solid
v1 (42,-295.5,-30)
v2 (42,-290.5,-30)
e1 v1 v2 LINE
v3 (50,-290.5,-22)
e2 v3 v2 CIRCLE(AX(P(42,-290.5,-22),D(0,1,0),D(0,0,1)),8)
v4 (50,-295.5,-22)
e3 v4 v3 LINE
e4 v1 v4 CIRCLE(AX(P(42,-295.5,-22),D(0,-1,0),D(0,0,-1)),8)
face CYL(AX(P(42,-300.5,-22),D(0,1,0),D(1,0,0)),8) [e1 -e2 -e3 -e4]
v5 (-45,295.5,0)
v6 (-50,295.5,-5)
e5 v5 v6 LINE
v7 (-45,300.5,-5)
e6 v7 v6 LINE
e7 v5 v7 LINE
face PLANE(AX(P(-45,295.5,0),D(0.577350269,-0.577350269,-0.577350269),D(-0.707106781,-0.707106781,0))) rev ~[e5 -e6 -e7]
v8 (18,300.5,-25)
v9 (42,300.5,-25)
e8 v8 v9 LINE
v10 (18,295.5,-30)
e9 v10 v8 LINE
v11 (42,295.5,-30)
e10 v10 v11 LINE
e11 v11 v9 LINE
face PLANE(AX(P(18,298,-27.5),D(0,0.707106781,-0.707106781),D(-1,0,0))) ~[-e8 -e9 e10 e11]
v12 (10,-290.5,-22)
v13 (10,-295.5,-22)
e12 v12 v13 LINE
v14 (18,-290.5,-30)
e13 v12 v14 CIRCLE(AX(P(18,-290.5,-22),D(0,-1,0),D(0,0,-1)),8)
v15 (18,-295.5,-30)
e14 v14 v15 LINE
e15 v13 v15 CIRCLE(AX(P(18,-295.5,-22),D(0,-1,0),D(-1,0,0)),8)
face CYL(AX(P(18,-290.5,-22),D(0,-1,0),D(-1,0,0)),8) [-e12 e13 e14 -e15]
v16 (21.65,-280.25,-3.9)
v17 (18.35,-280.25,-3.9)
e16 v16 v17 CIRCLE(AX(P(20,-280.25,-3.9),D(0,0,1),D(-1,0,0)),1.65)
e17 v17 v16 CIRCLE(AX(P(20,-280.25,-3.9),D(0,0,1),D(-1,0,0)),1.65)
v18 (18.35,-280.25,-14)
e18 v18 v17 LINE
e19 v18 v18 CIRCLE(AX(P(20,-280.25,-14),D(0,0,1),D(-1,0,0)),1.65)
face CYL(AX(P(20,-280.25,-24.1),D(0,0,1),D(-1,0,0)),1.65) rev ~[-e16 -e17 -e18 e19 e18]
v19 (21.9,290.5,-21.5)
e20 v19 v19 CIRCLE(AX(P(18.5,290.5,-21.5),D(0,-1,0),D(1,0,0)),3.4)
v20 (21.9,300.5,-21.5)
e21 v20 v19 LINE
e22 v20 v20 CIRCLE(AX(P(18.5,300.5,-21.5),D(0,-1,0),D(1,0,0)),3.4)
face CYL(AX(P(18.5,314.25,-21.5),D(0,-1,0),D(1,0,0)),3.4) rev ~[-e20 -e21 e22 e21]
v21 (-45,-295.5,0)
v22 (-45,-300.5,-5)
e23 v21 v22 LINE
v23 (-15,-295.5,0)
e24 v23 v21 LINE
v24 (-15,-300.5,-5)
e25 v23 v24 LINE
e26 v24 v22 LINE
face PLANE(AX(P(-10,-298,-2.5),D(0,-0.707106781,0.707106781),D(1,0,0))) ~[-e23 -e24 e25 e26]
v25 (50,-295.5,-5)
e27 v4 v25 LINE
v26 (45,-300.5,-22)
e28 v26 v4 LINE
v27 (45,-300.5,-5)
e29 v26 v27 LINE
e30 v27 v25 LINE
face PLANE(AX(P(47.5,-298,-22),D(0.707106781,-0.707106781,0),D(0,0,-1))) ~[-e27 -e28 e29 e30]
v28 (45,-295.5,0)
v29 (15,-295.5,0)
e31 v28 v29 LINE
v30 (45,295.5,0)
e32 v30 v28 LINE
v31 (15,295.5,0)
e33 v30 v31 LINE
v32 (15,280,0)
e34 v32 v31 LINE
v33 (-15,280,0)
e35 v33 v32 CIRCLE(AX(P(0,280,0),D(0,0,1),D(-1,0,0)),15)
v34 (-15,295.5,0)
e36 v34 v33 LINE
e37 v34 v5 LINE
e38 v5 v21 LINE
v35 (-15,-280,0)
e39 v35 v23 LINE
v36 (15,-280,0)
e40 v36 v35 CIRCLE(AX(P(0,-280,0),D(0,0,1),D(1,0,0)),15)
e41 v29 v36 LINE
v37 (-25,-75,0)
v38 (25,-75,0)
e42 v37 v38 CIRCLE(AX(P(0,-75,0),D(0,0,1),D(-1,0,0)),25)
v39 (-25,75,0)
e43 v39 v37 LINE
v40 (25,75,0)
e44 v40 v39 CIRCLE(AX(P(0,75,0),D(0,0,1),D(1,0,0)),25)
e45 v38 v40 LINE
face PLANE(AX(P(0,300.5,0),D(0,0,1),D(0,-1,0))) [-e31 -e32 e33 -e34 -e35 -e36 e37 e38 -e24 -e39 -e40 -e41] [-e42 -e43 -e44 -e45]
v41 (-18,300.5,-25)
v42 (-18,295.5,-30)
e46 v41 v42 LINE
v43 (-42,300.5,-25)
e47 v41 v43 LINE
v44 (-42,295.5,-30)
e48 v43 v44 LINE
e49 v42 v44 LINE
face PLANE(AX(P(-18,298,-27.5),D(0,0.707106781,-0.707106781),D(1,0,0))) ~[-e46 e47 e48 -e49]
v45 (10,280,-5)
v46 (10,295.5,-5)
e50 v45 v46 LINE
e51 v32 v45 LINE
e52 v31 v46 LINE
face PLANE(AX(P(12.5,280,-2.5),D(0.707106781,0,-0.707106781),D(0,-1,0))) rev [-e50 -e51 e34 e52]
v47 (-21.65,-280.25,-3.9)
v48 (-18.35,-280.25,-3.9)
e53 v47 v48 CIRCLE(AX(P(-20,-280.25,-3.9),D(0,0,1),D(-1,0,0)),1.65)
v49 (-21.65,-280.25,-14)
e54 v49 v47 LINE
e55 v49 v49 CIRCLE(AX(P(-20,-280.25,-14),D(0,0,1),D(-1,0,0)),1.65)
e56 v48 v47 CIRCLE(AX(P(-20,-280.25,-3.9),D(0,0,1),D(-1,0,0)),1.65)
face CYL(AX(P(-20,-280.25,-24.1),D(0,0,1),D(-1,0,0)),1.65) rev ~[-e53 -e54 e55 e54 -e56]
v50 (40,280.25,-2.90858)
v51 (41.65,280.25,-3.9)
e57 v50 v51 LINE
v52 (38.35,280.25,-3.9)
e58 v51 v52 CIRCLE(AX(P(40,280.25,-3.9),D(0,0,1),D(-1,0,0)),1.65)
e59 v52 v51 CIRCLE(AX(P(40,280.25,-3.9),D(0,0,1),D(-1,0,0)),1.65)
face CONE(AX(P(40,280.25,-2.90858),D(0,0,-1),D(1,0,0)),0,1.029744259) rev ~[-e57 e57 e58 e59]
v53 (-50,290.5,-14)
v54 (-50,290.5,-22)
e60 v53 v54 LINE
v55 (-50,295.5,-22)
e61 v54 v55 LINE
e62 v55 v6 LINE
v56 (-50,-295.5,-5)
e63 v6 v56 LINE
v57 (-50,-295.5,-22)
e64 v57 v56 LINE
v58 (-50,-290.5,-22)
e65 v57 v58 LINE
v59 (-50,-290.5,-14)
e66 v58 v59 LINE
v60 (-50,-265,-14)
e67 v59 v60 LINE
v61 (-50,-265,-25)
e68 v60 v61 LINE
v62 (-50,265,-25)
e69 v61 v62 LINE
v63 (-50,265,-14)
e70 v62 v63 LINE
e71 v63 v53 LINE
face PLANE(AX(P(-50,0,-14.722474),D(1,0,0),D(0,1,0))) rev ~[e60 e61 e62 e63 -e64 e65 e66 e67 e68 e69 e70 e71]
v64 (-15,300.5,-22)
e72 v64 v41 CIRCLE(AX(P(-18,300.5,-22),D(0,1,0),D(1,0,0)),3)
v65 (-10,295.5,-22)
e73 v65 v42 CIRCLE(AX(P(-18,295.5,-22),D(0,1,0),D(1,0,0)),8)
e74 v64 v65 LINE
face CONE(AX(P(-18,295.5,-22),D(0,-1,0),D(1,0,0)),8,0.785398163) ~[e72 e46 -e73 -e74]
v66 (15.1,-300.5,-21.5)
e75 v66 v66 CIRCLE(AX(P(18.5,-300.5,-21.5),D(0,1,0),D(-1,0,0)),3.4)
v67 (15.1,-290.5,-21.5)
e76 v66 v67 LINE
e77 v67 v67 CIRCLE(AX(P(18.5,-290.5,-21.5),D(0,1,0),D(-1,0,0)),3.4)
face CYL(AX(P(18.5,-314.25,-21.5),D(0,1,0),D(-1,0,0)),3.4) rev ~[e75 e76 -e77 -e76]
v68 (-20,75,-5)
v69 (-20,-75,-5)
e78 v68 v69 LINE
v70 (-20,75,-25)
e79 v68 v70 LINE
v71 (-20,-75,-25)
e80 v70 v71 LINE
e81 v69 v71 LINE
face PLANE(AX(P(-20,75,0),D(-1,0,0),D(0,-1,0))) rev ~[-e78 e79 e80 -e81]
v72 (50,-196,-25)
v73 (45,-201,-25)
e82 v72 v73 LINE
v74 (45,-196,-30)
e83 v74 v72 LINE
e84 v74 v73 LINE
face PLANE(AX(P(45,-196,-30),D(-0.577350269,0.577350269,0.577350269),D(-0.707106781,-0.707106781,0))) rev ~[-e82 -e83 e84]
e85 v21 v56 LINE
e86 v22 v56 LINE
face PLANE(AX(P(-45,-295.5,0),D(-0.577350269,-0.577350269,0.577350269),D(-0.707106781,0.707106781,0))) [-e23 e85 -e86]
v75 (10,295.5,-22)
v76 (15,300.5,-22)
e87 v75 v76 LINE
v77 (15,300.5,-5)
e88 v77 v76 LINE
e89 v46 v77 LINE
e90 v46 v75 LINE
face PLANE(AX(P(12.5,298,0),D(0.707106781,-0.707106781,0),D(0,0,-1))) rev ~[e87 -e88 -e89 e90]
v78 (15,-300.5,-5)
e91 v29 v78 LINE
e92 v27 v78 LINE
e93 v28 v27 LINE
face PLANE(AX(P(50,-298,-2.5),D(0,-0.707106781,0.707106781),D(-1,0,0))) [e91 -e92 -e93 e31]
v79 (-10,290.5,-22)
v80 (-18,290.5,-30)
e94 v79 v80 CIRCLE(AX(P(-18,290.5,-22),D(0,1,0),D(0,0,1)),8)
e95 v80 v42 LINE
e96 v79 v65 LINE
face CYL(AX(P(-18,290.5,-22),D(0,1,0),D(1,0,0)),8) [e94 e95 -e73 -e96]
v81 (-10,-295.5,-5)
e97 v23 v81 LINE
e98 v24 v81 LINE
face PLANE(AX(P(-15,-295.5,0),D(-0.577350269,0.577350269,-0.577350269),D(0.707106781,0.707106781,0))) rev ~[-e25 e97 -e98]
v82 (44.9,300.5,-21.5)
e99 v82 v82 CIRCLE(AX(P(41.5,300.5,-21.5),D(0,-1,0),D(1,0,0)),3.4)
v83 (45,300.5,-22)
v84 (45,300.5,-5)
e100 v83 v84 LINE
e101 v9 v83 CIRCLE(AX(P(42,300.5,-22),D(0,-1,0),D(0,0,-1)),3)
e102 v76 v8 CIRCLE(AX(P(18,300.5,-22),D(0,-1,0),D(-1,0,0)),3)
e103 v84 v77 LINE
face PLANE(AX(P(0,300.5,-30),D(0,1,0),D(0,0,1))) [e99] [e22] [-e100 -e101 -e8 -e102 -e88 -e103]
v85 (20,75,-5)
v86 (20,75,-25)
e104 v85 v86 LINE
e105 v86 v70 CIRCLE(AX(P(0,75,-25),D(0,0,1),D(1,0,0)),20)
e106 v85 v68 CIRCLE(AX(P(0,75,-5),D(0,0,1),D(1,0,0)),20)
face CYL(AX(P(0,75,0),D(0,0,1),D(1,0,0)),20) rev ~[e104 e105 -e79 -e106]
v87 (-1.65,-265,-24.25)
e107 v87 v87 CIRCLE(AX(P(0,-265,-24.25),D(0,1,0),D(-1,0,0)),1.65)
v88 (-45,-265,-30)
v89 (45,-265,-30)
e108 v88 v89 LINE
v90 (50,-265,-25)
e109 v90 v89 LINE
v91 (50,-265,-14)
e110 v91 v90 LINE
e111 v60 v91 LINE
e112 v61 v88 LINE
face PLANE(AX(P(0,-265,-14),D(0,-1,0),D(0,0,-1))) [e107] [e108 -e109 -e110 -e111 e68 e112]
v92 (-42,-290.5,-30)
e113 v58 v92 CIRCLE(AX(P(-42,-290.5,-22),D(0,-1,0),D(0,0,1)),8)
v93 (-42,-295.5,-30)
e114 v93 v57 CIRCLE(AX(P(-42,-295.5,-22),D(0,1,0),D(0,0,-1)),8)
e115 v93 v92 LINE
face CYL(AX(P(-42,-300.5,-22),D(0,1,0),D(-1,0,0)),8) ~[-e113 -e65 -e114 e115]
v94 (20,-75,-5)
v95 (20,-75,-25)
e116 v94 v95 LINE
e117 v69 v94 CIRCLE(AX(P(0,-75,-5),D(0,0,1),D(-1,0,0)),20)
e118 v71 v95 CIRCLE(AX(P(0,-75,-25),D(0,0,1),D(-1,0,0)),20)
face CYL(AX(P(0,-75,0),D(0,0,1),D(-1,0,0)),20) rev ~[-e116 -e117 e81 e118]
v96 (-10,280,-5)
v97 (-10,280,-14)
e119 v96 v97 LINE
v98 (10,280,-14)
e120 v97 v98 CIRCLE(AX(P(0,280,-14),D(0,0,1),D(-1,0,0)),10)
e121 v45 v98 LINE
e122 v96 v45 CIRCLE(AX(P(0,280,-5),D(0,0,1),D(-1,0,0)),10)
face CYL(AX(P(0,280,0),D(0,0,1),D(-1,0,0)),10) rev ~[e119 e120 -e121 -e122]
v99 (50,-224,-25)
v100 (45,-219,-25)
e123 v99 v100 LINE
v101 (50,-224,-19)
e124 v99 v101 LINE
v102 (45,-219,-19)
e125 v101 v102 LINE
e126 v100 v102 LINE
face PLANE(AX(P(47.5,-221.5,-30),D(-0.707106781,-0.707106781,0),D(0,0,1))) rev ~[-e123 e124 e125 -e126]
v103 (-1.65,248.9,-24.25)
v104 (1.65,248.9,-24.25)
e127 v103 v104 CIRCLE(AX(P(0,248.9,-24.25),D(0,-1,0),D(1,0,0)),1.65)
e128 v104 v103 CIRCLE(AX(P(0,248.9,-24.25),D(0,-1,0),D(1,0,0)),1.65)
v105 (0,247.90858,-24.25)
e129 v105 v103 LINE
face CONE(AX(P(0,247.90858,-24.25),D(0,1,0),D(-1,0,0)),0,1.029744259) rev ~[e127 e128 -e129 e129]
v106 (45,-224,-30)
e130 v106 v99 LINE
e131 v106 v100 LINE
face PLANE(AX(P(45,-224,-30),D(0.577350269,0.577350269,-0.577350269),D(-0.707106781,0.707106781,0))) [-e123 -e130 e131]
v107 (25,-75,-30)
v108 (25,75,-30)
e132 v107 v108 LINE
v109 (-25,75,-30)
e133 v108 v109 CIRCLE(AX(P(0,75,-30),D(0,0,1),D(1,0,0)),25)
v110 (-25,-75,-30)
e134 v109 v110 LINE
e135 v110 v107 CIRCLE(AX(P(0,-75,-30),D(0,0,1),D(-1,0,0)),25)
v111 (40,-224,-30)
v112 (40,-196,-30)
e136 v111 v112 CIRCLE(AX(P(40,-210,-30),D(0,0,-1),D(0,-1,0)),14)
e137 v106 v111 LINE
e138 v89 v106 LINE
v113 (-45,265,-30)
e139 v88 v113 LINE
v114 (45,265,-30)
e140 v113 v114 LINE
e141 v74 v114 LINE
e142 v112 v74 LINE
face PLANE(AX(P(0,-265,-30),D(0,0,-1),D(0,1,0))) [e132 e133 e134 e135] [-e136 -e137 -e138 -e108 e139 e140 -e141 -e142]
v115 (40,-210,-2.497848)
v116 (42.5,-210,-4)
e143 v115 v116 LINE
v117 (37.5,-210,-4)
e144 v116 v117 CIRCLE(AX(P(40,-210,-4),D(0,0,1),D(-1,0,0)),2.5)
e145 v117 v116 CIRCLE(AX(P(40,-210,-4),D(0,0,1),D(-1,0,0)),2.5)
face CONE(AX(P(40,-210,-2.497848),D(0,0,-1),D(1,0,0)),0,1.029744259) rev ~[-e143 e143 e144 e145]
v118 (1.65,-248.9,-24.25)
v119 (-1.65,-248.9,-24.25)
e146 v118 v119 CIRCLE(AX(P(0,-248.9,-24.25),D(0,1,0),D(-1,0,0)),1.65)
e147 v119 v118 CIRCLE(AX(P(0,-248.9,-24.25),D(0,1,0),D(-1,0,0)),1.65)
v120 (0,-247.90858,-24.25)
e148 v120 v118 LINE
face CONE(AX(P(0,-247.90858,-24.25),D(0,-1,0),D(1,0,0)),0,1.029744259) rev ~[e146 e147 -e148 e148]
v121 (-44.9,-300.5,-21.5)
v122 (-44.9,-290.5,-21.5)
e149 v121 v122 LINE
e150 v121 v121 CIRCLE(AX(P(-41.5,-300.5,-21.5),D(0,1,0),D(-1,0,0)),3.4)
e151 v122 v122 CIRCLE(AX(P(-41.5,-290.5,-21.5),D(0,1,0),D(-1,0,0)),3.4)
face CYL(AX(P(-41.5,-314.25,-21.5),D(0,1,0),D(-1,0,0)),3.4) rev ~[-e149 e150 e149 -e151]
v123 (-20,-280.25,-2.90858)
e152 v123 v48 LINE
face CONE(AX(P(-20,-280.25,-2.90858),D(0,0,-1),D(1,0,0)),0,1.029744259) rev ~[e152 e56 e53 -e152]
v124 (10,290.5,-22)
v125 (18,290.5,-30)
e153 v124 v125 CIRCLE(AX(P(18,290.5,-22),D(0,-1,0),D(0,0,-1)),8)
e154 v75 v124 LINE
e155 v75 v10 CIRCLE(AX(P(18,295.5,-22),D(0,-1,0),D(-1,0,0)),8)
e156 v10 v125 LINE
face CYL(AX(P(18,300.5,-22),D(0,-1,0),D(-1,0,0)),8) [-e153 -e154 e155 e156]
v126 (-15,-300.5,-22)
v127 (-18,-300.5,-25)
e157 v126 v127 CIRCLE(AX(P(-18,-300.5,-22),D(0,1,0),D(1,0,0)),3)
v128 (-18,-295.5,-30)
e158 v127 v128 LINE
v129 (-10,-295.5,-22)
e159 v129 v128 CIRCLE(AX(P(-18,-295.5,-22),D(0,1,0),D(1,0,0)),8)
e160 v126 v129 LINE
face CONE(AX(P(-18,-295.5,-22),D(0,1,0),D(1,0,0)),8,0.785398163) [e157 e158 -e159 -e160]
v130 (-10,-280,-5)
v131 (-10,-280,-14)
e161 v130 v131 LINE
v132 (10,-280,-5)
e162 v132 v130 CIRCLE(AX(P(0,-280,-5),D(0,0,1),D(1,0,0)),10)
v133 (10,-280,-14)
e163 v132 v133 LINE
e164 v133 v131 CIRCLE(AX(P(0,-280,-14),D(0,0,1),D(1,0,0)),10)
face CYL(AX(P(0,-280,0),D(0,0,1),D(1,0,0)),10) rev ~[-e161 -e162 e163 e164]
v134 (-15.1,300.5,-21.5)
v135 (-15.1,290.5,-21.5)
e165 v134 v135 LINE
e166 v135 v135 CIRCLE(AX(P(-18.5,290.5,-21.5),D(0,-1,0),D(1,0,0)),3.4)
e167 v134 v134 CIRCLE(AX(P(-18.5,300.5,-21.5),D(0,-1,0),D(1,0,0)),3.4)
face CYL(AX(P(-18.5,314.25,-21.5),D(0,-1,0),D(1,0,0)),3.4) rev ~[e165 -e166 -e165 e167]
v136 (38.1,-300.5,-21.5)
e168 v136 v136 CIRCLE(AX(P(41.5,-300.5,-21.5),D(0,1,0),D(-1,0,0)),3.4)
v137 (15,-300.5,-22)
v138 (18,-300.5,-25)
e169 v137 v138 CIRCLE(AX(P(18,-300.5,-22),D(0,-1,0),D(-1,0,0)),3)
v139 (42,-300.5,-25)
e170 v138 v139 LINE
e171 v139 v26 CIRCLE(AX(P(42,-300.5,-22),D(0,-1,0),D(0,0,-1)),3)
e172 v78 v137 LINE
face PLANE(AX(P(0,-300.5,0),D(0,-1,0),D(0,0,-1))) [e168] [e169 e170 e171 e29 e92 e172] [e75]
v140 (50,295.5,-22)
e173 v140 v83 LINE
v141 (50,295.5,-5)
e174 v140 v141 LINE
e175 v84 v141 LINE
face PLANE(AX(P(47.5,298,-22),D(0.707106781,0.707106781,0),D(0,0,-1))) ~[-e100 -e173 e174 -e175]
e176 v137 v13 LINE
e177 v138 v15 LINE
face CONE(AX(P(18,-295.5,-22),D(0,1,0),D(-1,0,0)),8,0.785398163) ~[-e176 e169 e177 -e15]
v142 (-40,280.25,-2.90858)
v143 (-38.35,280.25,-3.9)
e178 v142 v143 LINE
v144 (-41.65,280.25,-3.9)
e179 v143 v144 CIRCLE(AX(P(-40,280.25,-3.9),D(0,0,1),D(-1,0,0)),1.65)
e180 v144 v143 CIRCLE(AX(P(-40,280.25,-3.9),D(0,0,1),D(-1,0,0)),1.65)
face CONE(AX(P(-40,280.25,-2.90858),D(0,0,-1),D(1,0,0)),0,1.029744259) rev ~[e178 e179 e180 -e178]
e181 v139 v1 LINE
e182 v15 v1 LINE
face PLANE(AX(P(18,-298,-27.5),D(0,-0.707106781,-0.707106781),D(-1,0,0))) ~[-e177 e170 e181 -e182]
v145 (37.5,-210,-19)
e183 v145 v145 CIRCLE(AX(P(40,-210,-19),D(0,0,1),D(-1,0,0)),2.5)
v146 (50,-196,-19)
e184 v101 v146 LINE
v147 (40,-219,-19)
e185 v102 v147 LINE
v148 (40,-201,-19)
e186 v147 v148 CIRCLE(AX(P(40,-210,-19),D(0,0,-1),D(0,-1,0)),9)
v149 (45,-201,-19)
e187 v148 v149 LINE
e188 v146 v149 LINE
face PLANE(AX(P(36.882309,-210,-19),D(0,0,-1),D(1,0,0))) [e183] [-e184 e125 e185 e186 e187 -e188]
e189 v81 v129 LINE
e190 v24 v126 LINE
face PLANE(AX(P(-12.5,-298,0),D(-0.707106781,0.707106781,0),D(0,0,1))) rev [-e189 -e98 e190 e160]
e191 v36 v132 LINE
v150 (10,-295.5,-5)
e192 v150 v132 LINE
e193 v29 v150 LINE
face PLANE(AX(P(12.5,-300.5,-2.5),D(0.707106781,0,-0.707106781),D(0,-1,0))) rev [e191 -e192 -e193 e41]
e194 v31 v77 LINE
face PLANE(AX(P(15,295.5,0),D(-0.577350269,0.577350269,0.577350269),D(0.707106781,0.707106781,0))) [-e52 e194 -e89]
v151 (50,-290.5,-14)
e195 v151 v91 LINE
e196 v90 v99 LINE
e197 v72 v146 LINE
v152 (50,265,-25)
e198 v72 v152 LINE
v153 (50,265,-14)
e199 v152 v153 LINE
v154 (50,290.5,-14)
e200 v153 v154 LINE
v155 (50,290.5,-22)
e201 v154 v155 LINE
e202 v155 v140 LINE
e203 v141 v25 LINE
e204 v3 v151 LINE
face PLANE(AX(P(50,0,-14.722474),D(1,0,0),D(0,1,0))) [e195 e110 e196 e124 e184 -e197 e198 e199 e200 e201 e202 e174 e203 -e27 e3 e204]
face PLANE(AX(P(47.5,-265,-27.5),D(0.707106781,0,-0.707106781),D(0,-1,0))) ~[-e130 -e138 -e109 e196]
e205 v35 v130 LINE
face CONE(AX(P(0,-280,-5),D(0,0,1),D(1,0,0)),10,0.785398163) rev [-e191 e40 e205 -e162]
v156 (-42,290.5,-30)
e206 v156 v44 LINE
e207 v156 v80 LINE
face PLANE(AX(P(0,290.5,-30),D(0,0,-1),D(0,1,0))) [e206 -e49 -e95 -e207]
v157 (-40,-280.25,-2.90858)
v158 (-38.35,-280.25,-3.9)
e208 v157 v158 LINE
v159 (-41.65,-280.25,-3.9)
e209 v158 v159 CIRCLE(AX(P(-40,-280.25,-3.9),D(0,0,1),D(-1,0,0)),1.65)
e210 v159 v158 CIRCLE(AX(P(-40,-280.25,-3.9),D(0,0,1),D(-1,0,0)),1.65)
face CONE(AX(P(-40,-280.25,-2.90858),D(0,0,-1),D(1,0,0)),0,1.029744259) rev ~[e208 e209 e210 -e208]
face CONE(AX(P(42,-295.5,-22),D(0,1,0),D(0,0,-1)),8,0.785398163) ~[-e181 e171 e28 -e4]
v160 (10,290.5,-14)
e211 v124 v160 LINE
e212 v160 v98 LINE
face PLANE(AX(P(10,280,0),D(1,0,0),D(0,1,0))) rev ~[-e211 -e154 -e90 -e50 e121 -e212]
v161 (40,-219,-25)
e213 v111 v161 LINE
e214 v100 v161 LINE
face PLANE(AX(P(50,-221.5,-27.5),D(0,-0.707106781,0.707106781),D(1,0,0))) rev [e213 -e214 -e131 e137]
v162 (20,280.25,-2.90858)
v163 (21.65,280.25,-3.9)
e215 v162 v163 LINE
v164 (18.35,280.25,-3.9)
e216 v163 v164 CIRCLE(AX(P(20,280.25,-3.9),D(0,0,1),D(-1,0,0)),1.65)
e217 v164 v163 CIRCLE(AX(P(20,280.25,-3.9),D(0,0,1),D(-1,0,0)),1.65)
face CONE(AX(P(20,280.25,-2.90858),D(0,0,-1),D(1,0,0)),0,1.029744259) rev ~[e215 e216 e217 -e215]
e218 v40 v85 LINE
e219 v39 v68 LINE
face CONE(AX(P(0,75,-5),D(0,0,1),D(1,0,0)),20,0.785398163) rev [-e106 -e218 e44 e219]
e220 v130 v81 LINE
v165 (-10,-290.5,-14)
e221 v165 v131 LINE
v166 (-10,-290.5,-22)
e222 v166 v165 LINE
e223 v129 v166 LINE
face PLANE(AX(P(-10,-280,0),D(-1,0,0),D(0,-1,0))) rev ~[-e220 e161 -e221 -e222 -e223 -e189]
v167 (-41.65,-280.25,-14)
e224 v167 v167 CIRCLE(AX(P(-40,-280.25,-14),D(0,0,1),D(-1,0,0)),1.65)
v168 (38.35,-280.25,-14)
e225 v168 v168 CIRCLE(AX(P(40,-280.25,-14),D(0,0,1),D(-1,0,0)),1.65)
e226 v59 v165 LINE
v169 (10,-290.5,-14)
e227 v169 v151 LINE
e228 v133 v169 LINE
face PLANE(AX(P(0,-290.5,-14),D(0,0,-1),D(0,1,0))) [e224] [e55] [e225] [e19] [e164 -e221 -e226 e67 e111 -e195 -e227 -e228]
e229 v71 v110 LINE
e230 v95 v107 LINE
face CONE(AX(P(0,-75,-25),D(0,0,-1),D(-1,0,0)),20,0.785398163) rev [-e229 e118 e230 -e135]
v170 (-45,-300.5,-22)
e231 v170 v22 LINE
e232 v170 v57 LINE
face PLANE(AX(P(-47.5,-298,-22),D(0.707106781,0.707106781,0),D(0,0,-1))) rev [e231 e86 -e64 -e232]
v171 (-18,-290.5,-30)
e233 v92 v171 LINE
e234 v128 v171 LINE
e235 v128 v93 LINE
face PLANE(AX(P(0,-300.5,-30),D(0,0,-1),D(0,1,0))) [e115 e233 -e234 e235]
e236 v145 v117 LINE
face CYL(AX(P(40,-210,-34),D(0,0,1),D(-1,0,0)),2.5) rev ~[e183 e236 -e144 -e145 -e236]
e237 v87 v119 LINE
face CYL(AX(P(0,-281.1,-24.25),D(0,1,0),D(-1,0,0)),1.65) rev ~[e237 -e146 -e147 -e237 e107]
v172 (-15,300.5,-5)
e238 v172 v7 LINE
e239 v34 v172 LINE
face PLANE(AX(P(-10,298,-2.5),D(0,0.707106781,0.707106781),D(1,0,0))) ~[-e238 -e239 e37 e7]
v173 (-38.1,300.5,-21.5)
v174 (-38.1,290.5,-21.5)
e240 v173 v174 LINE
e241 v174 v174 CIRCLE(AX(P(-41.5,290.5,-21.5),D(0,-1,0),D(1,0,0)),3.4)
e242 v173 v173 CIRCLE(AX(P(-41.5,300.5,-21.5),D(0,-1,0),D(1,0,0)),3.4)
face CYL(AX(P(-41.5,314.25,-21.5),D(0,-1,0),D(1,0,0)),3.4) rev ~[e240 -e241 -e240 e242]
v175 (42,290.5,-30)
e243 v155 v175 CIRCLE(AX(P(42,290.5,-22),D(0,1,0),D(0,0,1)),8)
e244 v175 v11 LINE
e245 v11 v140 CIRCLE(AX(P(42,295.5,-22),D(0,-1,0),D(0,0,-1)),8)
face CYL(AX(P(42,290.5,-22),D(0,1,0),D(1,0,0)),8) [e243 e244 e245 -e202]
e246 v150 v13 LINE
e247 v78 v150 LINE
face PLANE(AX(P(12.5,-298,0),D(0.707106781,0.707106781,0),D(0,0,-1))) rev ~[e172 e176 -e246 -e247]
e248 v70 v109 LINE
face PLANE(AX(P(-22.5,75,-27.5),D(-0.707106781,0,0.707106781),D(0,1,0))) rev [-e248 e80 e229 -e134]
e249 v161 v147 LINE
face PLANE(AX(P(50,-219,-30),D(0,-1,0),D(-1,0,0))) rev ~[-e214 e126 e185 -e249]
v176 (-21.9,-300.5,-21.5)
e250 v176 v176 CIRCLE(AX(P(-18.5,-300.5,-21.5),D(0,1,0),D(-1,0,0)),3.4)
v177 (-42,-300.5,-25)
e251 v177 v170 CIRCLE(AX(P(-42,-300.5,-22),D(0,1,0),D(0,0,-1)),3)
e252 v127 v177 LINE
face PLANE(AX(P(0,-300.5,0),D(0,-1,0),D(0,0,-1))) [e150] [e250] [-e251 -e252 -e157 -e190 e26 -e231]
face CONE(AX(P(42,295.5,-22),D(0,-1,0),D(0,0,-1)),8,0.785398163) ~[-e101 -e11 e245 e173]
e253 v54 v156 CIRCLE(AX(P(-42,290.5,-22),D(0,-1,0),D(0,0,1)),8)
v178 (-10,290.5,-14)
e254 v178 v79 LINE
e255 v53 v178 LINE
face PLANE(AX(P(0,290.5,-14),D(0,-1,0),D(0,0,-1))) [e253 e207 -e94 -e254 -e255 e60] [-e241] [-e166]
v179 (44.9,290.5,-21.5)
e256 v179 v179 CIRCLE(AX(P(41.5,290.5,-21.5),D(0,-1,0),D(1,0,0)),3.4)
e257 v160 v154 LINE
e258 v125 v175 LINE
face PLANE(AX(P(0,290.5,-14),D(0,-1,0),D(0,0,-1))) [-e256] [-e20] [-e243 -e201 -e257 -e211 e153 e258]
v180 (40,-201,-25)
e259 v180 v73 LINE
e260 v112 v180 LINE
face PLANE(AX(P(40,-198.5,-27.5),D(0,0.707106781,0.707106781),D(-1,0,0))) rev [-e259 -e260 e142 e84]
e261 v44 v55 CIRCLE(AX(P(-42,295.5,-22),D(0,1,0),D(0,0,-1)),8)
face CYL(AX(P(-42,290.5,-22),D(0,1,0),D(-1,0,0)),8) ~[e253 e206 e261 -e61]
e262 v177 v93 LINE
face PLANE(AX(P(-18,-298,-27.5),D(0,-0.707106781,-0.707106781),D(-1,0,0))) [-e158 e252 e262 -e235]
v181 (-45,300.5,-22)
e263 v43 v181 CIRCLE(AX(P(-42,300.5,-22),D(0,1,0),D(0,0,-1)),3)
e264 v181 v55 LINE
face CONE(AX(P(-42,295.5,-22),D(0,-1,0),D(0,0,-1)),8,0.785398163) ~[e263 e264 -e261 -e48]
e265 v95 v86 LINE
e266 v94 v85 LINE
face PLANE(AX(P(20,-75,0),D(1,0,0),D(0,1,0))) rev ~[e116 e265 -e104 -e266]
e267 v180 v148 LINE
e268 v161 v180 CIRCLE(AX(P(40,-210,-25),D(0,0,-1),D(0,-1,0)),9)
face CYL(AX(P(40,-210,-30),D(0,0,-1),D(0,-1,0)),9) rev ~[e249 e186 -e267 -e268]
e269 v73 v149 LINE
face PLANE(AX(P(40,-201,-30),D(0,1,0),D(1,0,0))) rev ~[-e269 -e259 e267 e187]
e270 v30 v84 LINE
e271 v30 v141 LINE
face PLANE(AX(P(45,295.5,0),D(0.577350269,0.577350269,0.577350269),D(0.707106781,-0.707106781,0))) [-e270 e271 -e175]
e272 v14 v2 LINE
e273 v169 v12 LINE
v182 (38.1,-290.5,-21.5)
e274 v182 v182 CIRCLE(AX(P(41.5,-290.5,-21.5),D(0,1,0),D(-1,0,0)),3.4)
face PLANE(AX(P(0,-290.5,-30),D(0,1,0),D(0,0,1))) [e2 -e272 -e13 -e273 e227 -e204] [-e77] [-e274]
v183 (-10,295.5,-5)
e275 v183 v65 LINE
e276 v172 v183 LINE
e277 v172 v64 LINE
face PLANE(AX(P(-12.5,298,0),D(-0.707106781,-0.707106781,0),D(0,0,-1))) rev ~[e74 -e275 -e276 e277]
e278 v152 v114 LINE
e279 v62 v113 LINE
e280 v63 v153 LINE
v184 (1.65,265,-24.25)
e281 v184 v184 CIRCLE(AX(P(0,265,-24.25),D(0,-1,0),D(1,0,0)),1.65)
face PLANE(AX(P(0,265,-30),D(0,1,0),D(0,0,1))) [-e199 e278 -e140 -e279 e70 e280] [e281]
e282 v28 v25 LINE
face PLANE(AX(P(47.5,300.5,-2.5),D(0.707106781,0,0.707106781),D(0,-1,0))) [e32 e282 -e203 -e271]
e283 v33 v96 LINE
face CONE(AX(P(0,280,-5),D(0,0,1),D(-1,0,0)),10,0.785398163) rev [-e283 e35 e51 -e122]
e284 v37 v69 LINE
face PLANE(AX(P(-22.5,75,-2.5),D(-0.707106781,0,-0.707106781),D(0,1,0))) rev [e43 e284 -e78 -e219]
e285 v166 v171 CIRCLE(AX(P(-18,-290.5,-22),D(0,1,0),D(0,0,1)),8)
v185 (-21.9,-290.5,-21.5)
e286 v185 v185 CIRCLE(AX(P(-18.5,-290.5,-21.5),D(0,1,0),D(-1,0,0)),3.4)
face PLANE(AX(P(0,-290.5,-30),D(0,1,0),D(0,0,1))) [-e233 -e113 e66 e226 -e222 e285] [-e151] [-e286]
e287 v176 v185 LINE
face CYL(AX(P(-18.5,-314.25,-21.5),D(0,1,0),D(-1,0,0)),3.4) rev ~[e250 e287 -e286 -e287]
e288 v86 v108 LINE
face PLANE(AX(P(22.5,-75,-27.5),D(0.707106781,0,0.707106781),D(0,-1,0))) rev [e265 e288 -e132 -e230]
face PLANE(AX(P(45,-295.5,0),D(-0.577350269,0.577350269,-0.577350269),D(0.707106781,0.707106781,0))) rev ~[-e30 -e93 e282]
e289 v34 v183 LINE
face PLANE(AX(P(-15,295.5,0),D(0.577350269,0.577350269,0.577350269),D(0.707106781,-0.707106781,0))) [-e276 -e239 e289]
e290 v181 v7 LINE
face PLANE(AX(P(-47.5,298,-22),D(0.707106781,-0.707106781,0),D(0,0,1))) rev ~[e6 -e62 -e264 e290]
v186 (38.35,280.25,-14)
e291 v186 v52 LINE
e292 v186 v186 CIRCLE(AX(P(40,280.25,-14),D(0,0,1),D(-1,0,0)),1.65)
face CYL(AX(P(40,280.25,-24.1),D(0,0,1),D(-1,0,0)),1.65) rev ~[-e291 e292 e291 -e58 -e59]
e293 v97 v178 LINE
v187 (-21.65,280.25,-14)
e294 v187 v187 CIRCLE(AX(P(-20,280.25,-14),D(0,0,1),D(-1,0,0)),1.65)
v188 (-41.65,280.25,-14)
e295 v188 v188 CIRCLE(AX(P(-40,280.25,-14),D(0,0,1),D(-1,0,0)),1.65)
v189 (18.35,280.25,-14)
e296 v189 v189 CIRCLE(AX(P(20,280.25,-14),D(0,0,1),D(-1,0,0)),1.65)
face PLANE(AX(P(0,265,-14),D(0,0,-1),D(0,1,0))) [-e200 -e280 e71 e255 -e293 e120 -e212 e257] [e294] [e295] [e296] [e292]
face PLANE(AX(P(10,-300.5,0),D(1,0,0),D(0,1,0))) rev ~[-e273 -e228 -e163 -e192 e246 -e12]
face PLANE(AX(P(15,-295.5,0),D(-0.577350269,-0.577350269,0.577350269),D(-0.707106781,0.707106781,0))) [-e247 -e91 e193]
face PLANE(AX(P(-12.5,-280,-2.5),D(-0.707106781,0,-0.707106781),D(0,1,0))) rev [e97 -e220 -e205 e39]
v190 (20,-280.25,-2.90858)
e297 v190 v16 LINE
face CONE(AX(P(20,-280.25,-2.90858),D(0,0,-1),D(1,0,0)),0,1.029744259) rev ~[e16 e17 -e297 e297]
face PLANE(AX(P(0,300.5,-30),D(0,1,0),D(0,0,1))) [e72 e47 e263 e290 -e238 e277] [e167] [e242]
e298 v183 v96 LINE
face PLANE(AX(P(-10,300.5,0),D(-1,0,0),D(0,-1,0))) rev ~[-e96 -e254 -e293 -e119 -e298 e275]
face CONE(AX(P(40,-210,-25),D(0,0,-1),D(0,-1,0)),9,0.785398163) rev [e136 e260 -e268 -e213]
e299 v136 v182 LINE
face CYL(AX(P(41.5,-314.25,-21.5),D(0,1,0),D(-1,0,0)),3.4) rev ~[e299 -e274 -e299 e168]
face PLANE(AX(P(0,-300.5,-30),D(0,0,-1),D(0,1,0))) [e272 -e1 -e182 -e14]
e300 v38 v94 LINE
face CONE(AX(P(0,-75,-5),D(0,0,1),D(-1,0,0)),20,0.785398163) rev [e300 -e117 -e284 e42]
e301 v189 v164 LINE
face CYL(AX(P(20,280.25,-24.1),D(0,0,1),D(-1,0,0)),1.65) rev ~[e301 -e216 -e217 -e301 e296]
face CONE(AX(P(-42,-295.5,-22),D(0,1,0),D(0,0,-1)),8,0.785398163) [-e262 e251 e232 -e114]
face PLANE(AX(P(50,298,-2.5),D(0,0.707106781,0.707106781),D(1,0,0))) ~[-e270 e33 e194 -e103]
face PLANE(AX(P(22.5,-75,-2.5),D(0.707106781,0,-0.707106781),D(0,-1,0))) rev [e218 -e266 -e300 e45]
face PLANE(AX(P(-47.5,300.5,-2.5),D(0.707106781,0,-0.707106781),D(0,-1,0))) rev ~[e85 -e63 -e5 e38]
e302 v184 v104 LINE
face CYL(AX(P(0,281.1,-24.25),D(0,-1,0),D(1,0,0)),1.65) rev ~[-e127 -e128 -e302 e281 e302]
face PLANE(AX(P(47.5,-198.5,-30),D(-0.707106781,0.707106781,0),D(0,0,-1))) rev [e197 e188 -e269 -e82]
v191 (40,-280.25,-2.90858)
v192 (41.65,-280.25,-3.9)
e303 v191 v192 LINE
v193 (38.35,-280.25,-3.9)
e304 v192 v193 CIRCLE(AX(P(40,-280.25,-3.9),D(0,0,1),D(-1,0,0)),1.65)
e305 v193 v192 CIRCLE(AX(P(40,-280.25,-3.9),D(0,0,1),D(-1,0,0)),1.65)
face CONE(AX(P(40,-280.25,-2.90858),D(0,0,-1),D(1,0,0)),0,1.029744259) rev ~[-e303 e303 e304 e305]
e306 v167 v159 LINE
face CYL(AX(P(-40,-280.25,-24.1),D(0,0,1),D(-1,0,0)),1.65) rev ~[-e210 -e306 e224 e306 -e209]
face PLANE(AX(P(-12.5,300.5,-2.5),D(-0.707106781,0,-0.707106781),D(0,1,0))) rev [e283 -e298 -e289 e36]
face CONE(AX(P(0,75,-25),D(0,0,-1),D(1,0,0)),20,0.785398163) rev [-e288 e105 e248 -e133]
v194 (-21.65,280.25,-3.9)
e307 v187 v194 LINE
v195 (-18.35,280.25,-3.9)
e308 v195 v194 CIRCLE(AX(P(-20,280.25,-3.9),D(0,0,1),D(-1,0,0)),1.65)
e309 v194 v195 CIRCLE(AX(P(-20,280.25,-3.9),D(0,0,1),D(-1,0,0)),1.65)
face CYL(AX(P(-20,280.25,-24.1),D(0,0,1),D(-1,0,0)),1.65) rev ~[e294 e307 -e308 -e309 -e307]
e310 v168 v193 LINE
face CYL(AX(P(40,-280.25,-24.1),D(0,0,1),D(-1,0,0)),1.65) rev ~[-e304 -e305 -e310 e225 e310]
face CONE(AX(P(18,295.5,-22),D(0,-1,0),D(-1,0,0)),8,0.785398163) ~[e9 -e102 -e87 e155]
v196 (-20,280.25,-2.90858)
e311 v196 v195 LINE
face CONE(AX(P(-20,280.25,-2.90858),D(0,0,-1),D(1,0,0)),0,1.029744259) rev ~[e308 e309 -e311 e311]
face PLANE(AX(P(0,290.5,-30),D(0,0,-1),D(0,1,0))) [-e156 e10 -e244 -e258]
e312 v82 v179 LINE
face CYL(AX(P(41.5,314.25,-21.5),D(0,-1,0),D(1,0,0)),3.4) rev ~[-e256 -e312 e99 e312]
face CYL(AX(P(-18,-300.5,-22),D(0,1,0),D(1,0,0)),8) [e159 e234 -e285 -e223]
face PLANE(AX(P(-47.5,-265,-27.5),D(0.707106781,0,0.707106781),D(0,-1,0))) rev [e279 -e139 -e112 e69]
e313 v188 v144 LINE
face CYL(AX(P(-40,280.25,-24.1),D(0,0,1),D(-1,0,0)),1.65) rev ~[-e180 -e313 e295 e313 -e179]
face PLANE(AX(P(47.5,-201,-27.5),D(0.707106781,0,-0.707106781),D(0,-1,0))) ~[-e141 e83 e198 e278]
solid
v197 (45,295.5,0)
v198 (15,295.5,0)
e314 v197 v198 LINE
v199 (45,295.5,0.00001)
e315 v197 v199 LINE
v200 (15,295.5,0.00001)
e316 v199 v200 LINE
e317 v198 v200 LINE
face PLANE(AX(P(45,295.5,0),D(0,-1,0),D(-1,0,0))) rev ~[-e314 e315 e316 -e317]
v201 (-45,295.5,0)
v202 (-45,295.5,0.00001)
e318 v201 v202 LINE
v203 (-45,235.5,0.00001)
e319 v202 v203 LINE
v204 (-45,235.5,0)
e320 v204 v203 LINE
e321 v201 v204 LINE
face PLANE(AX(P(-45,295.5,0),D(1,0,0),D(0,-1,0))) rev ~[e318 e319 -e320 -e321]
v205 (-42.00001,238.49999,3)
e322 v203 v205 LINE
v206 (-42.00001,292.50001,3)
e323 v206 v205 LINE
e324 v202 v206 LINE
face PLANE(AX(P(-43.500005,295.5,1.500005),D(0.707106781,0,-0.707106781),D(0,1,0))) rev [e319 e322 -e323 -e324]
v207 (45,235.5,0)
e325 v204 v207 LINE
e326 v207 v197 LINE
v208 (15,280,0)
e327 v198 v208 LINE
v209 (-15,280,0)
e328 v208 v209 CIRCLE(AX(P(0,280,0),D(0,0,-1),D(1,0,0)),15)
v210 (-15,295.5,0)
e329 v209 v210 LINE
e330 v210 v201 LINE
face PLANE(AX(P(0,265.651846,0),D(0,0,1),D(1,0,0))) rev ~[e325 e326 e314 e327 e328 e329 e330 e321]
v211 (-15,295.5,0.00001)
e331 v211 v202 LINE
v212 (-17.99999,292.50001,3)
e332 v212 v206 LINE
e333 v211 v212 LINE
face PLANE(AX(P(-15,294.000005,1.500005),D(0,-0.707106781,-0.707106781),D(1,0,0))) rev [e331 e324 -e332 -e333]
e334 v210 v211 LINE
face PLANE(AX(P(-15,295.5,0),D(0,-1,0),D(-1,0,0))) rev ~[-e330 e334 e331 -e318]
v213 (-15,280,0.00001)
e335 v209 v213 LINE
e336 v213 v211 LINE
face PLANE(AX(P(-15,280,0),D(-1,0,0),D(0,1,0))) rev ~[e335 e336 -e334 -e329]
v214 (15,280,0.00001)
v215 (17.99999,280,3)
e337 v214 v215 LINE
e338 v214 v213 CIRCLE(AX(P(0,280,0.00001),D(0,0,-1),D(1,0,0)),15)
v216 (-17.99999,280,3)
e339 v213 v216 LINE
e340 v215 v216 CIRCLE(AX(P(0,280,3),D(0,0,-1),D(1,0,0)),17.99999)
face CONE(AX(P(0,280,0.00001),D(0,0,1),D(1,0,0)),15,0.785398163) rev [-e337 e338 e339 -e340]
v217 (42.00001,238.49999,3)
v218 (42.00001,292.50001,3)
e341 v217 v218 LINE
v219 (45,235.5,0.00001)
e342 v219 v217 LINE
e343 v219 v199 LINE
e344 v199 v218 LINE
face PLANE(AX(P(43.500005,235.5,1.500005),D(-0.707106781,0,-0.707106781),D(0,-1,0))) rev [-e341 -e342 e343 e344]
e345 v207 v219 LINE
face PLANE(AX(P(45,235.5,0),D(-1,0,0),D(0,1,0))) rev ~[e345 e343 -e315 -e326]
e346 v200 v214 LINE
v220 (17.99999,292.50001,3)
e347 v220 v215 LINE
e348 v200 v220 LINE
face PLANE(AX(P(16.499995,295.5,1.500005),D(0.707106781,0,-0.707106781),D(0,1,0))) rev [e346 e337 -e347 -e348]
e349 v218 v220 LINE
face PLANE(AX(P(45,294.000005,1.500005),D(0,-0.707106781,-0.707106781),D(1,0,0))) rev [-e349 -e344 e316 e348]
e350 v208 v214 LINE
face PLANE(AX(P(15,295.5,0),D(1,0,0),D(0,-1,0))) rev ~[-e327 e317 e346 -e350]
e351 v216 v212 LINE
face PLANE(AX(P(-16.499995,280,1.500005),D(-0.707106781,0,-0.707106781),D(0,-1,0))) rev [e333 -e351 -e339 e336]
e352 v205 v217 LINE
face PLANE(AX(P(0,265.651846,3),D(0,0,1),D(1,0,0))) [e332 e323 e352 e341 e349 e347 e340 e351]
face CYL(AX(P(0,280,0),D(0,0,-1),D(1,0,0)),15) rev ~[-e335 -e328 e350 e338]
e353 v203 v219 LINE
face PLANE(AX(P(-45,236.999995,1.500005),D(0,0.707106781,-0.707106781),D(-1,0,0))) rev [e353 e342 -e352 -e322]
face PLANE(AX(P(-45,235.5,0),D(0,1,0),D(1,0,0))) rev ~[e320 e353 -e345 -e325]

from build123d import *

# Parameters (mm, degrees)
F1_DEPTH       = 50
F3_DEPTH       = 30.001
F6_D           = 6.8
F6_DEPTH       = 13.75
F6_TIP         = 2.0429261047
F6_ON_F4_D     = 6.8
F6_ON_F4_DEPTH = 13.75
F6_ON_F4_TIP   = 2.0429261047
F7_D           = 3.3
F7_DEPTH       = 16.1
F7_START       = 35.5
F7_TIP         = 0.9914200214
F7_ON_F4_D     = 3.3
F7_ON_F4_DEPTH = 16.1
F7_ON_F4_START = 35.5
F7_ON_F4_TIP   = 0.9914200214
F9_D           = 3.3
F9_DEPTH       = 10.1
F9_TIP         = 0.9914200214
F11_DEPTH      = 11
F12_D          = 5
F12_DEPTH      = 15
F12_START      = 11
F12_TIP        = 1.5021515476
F13_R          = 8
F14_SIZE       = 5
F16_DEPTH      = 3
F17_SIZE       = 2.99999


# Not quite as in the source:
# - a fillet or chamfer is up to 0.001 mm smaller than in the source, because OpenCascade refuses the exact size


with BuildPart() as f1:
    # F0 (on Right) → F1 (new body, symmetric)
    with BuildSketch(Plane.YZ):
        Polygon((-300.5, 0), (-300.5, -30), (-290.5, -30), (-290.5, -14), (-265, -14), (-265, -30), (265, -30), (265, -14), (290.5, -14), (290.5, -30), (300.5, -30), (300.5, 0), align=None)
    extrude(amount=F1_DEPTH, both=True)

    # F2 (on face) → F3 (cut, through all)
    with BuildSketch(Plane.XY):
        with BuildLine():
            ThreePointArc((-20, -75), (0, -95), (20, -75))
            Line((20, -75), (-20, -75))
        make_face()
        with BuildLine():
            ThreePointArc((-20, -75), (0, -55), (20, -75))
            Line((20, -75), (20, 75))
            ThreePointArc((20, 75), (0, 55), (-20, 75))
            Line((-20, 75), (-20, -75))
        make_face()
        with BuildLine():
            Line((-20, -75), (20, -75))
            ThreePointArc((20, -75), (0, -55), (-20, -75))
        make_face()
        with BuildLine():
            ThreePointArc((-20, 75), (0, 55), (20, 75))
            Line((20, 75), (-20, 75))
        make_face()
        with BuildLine():
            Line((-20, 75), (20, 75))
            ThreePointArc((20, 75), (0, 95), (-20, 75))
        make_face()
        with BuildLine():
            Line((-10, 280), (10, 280))
            ThreePointArc((10, 280), (0, 290), (-10, 280))
        make_face()
        with BuildLine():
            ThreePointArc((-10, 280), (0, 270), (10, 280))
            Line((10, 280), (-10, 280))
        make_face()
        with BuildLine():
            ThreePointArc((-10, 280), (0, 290), (10, 280))
            Line((10, 280), (10, 300.5))
            Line((10, 300.5), (-10, 300.5))
            Line((-10, 300.5), (-10, 280))
        make_face()
        with BuildLine():
            Line((-10, -280), (10, -280))
            ThreePointArc((10, -280), (0, -270), (-10, -280))
        make_face()
        with BuildLine():
            Line((10, -300.5), (10, -280))
            ThreePointArc((10, -280), (0, -290), (-10, -280))
            Line((-10, -280), (-10, -300.5))
            Line((-10, -300.5), (10, -300.5))
        make_face()
        with BuildLine():
            ThreePointArc((-10, -280), (0, -290), (10, -280))
            Line((10, -280), (-10, -280))
        make_face()
    extrude(amount=-F3_DEPTH, mode=Mode.SUBTRACT)

    # F6
    with Locations(Plane.XZ.offset(300.5)):
        with Locations((-41.5, -21.5), (-18.5, -21.5), (18.5, -21.5), (41.5, -21.5)):
            Hole(F6_D / 2, depth=F6_DEPTH)
            with Locations((0, 0, -(F6_DEPTH + F6_TIP / 2))):  # 118° drill point
                Cone(0, F6_D / 2, F6_TIP, mode=Mode.SUBTRACT)

    # F6 on F4
    with Locations(Plane(origin=(0, 300.5, 0), x_dir=(-1, 0, 0), z_dir=(0, 1, 0))):
        with Locations((-41.5, -21.5), (-18.5, -21.5), (18.5, -21.5), (41.5, -21.5)):
            Hole(F6_ON_F4_D / 2, depth=F6_ON_F4_DEPTH)
            with Locations((0, 0, -(F6_ON_F4_DEPTH + F6_ON_F4_TIP / 2))):  # 118° drill point
                Cone(0, F6_ON_F4_D / 2, F6_ON_F4_TIP, mode=Mode.SUBTRACT)

    # F7
    # its depths count from where the whole tool has entered the part; down to there all is cleared
    with Locations(Plane.XZ.offset(300.5)):
        with Locations((0, -24.25)):
            Hole(F7_D / 2, depth=F7_START)
    with Locations(Plane.XZ.offset(300.5).offset(-F7_START)):
        with Locations((0, -24.25)):
            Hole(F7_D / 2, depth=F7_DEPTH)
            with Locations((0, 0, -(F7_DEPTH + F7_TIP / 2))):  # 118° drill point
                Cone(0, F7_D / 2, F7_TIP, mode=Mode.SUBTRACT)

    # F7 on F4
    # its depths count from where the whole tool has entered the part; down to there all is cleared
    with Locations(Plane(origin=(0, 300.5, 0), x_dir=(-1, 0, 0), z_dir=(0, 1, 0))):
        with Locations((0, -24.25)):
            Hole(F7_ON_F4_D / 2, depth=F7_ON_F4_START)
    with Locations(Plane(origin=(0, 300.5, 0), x_dir=(-1, 0, 0), z_dir=(0, 1, 0)).offset(-F7_ON_F4_START)):
        with Locations((0, -24.25)):
            Hole(F7_ON_F4_D / 2, depth=F7_ON_F4_DEPTH)
            with Locations((0, 0, -(F7_ON_F4_DEPTH + F7_ON_F4_TIP / 2))):  # 118° drill point
                Cone(0, F7_ON_F4_D / 2, F7_ON_F4_TIP, mode=Mode.SUBTRACT)

    # F9
    with Locations(Plane(origin=(0, 0, -14), x_dir=(1, 0, 0), z_dir=(0, 0, -1))):
        with Locations((-40, 280.25), (-20, 280.25), (20, 280.25), (40, 280.25), (-40, -280.25), (-20, -280.25), (20, -280.25), (40, -280.25)):
            Hole(F9_D / 2, depth=F9_DEPTH)
            with Locations((0, 0, -(F9_DEPTH + F9_TIP / 2))):  # 118° drill point
                Cone(0, F9_D / 2, F9_TIP, mode=Mode.SUBTRACT)

    # F10 (on face) → F11 (cut)
    with BuildSketch(Plane(origin=(0, 0, -30), x_dir=(1, 0, 0), z_dir=(0, 0, -1))):
        with BuildLine():
            Line((40, 201), (40, 219))
            ThreePointArc((40, 219), (31, 210), (40, 201))
        make_face()
        with BuildLine():
            ThreePointArc((40, 201), (46.3639610307, 203.6360389693), (49, 210))
            ThreePointArc((49, 210), (46.3639610307, 216.3639610307), (40, 219))
            Line((40, 219), (40, 201))
        make_face()
        with BuildLine():
            ThreePointArc((40, 219), (46.3639610307, 216.3639610307), (49, 210))
            ThreePointArc((49, 210), (46.3639610307, 203.6360389693), (40, 201))
            Line((40, 201), (50, 201))
            Line((50, 201), (50, 219))
            Line((50, 219), (40, 219))
        make_face()
    extrude(amount=-F11_DEPTH, mode=Mode.SUBTRACT)

    # F12
    # its depths count from where the whole tool has entered the part; down to there all is cleared
    with Locations(Plane(origin=(0, 0, -30), x_dir=(1, 0, 0), z_dir=(0, 0, -1)).offset(-F12_START)):
        with Locations((40, 210)):
            Hole(F12_D / 2, depth=F12_DEPTH)
            with Locations((0, 0, -(F12_DEPTH + F12_TIP / 2))):  # 118° drill point
                Cone(0, F12_D / 2, F12_TIP, mode=Mode.SUBTRACT)

    # F13
    f13_edges = [f1.edges().sort_by_distance(p)[0] for p in [
        (10, -295.5, -30),
        (50, -295.5, -30),
        (-50, -295.5, -30),
        (-10, -295.5, -30),
        (-50, 295.5, -30),
        (-10, 295.5, -30),
        (50, 295.5, -30),
        (10, 295.5, -30),
    ]]
    fillet(f13_edges, radius=F13_R)

    # F14
    f14_edges = [f1.edges().sort_by_distance(p)[0] for p in [
        (10, 300.5, -11),
        (-10, 300.5, -11),
        (10, -300.5, -11),
        (-10, -300.5, -11),
        (50, -219, -24.5),
        (50, -201, -24.5),
        (-50, 0, -30),
        (50, -242, -30),
        (50, 32, -30),
        (0, 95, -30),
        (31, -210, -30),
        (-30, -300.5, 0),
        (30, -300.5, 0),
        (10, -290.25, 0),
        (-30, 300.5, 0),
        (-10, 290.25, 0),
        (0, 270, 0),
        (10, 290.25, 0),
        (30, 300.5, 0),
        (50, 0, 0),
        (0, -270, 0),
        (-10, -290.25, 0),
        (-50, 0, 0),
        (0, -95, 0),
        (20, 0, 0),
        (0, 95, 0),
        (-20, 0, 0),
    ]]
    chamfer(f14_edges, length=F14_SIZE)


with BuildPart() as f16:
    # F15 (on face) → F16 (new body)
    with BuildSketch(Plane.XY):
        with BuildLine():
            Line((-15, 295.5), (-45, 295.5))
            Line((-45, 295.5), (-45, 235.5))
            Line((-45, 235.5), (45, 235.5))
            Line((45, 235.5), (45, 295.5))
            Line((45, 295.5), (15, 295.5))
            Line((15, 295.5), (15, 280))
            ThreePointArc((15, 280), (0, 265), (-15, 280))
            Line((-15, 280), (-15, 295.5))
        make_face()
    extrude(amount=F16_DEPTH)

    # F17 (size 3 in the source; OpenCascade refuses exactly that, so slightly less here)
    f17_edges = [f16.edges().sort_by_distance(p)[0] for p in [
        (0, 235.5, 3),
        (0, 265, 3),
        (45, 265.5, 3),
        (-15, 287.75, 3),
        (-30, 295.5, 3),
        (-45, 265.5, 3),
        (30, 295.5, 3),
        (15, 287.75, 3),
    ]]
    chamfer(f17_edges, length=F17_SIZE)


solid = Compound([f1.part, f16.part])
